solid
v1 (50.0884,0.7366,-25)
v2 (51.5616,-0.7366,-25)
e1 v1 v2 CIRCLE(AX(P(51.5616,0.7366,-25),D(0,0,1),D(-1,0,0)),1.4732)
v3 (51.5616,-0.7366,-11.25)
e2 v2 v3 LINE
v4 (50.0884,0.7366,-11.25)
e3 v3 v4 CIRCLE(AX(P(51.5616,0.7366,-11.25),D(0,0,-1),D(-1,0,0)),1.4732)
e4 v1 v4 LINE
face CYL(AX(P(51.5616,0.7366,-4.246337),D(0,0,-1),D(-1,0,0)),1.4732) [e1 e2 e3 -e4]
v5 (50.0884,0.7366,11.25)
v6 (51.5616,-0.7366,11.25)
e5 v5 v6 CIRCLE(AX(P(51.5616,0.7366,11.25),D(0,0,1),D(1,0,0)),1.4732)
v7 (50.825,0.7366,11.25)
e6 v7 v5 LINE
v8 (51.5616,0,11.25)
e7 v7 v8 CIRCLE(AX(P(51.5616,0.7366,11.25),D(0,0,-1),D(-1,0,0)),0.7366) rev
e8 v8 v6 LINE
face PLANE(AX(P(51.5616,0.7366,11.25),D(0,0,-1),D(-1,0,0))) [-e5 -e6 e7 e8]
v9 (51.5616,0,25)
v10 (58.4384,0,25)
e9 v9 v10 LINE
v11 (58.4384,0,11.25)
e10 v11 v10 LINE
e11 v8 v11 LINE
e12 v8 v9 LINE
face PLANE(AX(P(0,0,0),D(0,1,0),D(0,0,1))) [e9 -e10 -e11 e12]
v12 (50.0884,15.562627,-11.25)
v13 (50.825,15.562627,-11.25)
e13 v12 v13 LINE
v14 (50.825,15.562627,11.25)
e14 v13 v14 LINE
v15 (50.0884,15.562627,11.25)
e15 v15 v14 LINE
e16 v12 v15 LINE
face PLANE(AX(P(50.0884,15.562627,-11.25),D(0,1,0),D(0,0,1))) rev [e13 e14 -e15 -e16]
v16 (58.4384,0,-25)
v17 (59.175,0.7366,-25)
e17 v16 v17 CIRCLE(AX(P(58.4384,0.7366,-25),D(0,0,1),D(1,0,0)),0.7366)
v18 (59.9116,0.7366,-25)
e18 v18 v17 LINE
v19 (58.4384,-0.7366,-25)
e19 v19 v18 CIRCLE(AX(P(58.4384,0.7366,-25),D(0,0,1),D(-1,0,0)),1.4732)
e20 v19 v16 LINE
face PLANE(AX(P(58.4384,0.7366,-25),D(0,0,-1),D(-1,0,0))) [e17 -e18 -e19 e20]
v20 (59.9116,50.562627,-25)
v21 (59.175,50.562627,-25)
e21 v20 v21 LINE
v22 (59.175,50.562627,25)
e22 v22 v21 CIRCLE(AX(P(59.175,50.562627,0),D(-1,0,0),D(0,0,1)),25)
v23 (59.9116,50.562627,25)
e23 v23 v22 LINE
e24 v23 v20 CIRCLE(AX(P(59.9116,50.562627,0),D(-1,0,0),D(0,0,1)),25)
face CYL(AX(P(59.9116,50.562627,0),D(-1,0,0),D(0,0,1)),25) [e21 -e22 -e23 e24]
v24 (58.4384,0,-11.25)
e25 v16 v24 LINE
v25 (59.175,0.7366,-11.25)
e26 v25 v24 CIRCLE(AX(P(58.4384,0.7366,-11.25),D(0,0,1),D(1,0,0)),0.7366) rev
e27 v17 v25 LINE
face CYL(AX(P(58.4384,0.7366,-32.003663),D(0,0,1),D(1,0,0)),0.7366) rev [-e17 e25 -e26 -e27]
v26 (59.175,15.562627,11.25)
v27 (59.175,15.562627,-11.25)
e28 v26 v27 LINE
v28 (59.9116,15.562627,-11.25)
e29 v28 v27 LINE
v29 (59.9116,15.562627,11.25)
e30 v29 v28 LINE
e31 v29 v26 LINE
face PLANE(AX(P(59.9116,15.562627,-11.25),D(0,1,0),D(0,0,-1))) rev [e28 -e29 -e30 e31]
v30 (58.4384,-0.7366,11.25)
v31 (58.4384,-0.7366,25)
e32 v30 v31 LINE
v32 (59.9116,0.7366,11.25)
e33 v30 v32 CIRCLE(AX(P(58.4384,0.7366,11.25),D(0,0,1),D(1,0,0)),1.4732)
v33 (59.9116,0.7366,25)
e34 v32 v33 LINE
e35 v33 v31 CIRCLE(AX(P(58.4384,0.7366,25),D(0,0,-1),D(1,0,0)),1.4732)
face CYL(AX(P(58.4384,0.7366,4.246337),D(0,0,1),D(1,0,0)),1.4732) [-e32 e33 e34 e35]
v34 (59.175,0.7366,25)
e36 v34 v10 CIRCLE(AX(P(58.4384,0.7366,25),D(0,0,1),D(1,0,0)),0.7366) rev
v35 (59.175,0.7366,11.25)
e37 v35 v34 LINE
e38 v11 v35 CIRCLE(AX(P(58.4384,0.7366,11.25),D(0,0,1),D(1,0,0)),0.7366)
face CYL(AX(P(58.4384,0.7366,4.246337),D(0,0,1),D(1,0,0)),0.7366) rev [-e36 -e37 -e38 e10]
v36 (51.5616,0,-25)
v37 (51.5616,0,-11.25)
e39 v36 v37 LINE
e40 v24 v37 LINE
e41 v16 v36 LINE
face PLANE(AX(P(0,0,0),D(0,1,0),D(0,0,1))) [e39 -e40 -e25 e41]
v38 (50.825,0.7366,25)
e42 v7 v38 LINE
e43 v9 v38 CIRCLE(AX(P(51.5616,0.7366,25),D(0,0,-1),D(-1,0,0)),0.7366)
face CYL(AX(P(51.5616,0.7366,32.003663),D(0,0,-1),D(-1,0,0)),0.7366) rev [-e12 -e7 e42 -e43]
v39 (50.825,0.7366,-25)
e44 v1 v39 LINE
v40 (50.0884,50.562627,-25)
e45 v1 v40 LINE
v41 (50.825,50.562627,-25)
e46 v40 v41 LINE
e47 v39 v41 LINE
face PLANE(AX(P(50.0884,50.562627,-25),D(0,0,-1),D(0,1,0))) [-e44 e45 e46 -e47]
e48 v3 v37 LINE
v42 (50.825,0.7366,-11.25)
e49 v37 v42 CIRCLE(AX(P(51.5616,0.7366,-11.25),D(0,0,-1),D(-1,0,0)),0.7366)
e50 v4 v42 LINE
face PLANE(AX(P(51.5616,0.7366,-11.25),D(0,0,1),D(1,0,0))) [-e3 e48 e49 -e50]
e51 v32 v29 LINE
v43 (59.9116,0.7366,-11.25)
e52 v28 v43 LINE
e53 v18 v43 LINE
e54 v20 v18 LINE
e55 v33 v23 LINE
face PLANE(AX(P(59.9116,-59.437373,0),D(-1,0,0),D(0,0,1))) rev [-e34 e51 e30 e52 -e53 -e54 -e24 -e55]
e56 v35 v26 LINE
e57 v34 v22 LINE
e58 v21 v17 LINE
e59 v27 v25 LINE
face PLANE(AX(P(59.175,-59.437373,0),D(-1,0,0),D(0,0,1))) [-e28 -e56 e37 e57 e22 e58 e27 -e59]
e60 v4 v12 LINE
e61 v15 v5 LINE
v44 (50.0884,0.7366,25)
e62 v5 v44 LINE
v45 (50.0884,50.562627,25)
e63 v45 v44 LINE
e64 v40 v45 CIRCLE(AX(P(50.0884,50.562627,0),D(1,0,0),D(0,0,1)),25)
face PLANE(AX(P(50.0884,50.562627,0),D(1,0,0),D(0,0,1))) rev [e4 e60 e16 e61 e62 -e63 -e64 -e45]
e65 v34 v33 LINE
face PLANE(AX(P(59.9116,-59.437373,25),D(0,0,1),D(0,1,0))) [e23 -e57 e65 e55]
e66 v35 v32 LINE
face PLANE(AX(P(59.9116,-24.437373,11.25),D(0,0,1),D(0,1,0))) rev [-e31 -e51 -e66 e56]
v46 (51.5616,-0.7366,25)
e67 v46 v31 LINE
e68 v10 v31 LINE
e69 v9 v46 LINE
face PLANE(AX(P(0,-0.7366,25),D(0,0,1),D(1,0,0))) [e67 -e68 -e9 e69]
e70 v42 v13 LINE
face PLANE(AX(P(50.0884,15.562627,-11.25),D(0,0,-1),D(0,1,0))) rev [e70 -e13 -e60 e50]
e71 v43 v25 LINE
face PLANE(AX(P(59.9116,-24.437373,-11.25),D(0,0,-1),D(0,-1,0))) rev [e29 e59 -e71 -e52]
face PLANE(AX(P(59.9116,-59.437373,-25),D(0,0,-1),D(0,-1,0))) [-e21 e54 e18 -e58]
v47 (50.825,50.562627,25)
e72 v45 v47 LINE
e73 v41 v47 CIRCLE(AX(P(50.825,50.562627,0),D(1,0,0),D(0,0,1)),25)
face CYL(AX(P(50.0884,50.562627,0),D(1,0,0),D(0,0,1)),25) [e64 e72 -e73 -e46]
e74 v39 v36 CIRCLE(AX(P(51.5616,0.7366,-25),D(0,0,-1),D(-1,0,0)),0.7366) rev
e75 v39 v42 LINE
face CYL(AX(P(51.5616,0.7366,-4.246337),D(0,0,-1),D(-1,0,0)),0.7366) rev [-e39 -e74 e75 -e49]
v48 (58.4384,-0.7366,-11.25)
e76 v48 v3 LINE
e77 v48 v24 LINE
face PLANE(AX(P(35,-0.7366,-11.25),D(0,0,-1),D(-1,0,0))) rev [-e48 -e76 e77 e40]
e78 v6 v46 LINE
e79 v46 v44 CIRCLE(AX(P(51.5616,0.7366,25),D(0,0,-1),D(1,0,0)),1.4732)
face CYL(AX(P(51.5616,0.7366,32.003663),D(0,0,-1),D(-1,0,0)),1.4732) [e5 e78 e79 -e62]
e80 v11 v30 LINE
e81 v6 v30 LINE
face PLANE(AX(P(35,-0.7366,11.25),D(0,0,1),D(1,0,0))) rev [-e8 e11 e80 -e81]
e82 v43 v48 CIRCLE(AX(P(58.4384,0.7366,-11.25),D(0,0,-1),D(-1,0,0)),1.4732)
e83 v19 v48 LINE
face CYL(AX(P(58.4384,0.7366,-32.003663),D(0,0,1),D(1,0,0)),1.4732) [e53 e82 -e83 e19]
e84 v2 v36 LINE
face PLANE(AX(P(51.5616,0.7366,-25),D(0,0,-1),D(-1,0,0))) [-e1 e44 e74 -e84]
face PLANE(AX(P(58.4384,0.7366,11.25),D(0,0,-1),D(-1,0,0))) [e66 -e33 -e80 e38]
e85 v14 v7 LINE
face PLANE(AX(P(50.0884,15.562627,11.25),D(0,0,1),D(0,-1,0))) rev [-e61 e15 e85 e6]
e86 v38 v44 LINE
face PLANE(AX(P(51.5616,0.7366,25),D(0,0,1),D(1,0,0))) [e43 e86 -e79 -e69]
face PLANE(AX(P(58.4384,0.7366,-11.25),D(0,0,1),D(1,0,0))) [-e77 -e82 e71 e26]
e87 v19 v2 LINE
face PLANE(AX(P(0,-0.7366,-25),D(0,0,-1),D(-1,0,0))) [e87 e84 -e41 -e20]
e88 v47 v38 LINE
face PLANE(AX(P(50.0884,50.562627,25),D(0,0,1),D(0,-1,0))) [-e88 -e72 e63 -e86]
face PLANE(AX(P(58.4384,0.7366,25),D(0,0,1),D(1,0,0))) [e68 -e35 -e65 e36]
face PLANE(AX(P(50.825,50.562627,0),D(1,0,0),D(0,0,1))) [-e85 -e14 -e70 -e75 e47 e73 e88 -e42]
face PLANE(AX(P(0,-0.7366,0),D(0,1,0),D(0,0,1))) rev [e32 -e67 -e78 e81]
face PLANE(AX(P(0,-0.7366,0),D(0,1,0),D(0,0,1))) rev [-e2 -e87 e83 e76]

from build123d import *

# Parameters (mm, degrees)
SKETCH2_W                  = 40
SKETCH2_H                  = 22.5
BASE_FLANGE1_DEPTH         = 0.7366
SKETCHED_START             = -25
SKETCHED_BEND1_DEPTH       = 50
SKETCHED_BEND1_2_DEPTH     = 13.75
SKETCHED_START_2           = 11.25
SKETCHED_BEND1_3_DEPTH     = 13.75
SKETCHED_START_3           = -26
SKETCHED_BEND1_4_OUTLINE_W = 0.7366
SKETCHED_BEND1_4_OUTLINE_H = 50
SKETCHED_BEND1_4_DEPTH     = 61
SKETCHED_START_4           = 75
SKETCHED_BEND1_5_OUTLINE_W = 0.7366
SKETCHED_BEND1_5_OUTLINE_H = 50
SKETCHED_BEND1_5_DEPTH     = 61
SKETCHED_START_5           = 50.0884
SKETCHED_BEND1_6_DEPTH     = 0.7366
SKETCHED_START_6           = 59.175
SKETCHED_BEND1_7_DEPTH     = 0.7366


with BuildPart() as part:
    # Base-Flange1: sheet metal written as solids
    # Sketch2 → Base-Flange1 (new body)
    with BuildSketch(Plane(origin=(0, 0, 0), x_dir=(1, 0, 0), z_dir=(0, 1, 0))):
        with BuildLine():
            Line((0, 25), (110, 25))
            ThreePointArc((110, 25), (135, 0), (110, -25))
            Line((110, -25), (0, -25))
            ThreePointArc((0, -25), (-25, 0), (0, 25))
        make_face()
        with Locations((55, 0)):
            Rectangle(SKETCH2_W, SKETCH2_H, mode=Mode.SUBTRACT)
    extrude(amount=-BASE_FLANGE1_DEPTH)

    # Sketched Bend1: read off the stored shape, not the designer's step
    # Sketched Bend1 outline → Sketched Bend1 (cut)
    with BuildSketch(Plane.XY.offset(SKETCHED_START)):
        with BuildLine():
            Line((35, -0.7366), (51.5616, -0.7366))
            ThreePointArc((51.5616, -0.7366), (50.825, -0.539228625), (50.285771375, 0))
            Line((50.285771375, 0), (35, 0))
            Line((35, 0), (35, -0.7366))
        make_face()
        with BuildLine():
            ThreePointArc((59.714228625, 0), (59.175, -0.539228625), (58.4384, -0.7366))
            Line((58.4384, -0.7366), (75, -0.7366))
            Line((75, -0.7366), (75, 0))
            Line((75, 0), (59.714228625, 0))
        make_face()
    extrude(amount=SKETCHED_BEND1_DEPTH, mode=Mode.SUBTRACT)

    # Sketched Bend1 2 outline → Sketched Bend1 2 (add)
    with BuildSketch(Plane.XY.offset(SKETCHED_START)):
        with BuildLine():
            ThreePointArc((50.0884, 0.7366), (50.138598073, 0.355307783), (50.285771375, 0))
            Line((50.285771375, 0), (51.5616, 0))
            ThreePointArc((51.5616, 0), (51.040745145, 0.215745145), (50.825, 0.7366))
            Line((50.825, 0.7366), (50.825, 15.562627139))
            Line((50.825, 15.562627139), (50.0884, 15.562627139))
            Line((50.0884, 15.562627139), (50.0884, 0.7366))
        make_face()
        with BuildLine():
            Line((58.4384, 0), (59.714228625, 0))
            ThreePointArc((59.714228625, 0), (59.861401927, 0.355307783), (59.9116, 0.7366))
            Line((59.9116, 0.7366), (59.9116, 15.562627139))
            Line((59.9116, 15.562627139), (59.175, 15.562627139))
            Line((59.175, 15.562627139), (59.175, 0.7366))
            ThreePointArc((59.175, 0.7366), (58.959254855, 0.215745145), (58.4384, 0))
        make_face()
    extrude(amount=SKETCHED_BEND1_2_DEPTH)

    # Sketched Bend1 3 outline → Sketched Bend1 3 (add)
    with BuildSketch(Plane.XY.offset(SKETCHED_START_2)):
        with BuildLine():
            ThreePointArc((50.0884, 0.7366), (50.138598073, 0.355307783), (50.285771375, 0))
            Line((50.285771375, 0), (51.5616, 0))
            ThreePointArc((51.5616, 0), (51.040745145, 0.215745145), (50.825, 0.7366))
            Line((50.825, 0.7366), (50.825, 15.562627139))
            Line((50.825, 15.562627139), (50.0884, 15.562627139))
            Line((50.0884, 15.562627139), (50.0884, 0.7366))
        make_face()
        with BuildLine():
            Line((58.4384, 0), (59.714228625, 0))
            ThreePointArc((59.714228625, 0), (59.861401927, 0.355307783), (59.9116, 0.7366))
            Line((59.9116, 0.7366), (59.9116, 15.562627139))
            Line((59.9116, 15.562627139), (59.175, 15.562627139))
            Line((59.175, 15.562627139), (59.175, 0.7366))
            ThreePointArc((59.175, 0.7366), (58.959254855, 0.215745145), (58.4384, 0))
        make_face()
    extrude(amount=SKETCHED_BEND1_3_DEPTH)

    # Sketched Bend1 4 outline → Sketched Bend1 4 (cut)
    with BuildSketch(Plane.YZ.offset(SKETCHED_START_3)):
        with Locations((-0.3683, 0)):
            Rectangle(SKETCHED_BEND1_4_OUTLINE_W, SKETCHED_BEND1_4_OUTLINE_H)
    extrude(amount=SKETCHED_BEND1_4_DEPTH, mode=Mode.SUBTRACT)

    # Sketched Bend1 5 outline → Sketched Bend1 5 (cut)
    with BuildSketch(Plane.YZ.offset(SKETCHED_START_4)):
        with Locations((-0.3683, 0)):
            Rectangle(SKETCHED_BEND1_5_OUTLINE_W, SKETCHED_BEND1_5_OUTLINE_H)
    extrude(amount=SKETCHED_BEND1_5_DEPTH, mode=Mode.SUBTRACT)

    # Sketched Bend1 6 outline → Sketched Bend1 6 (add)
    with BuildSketch(Plane.YZ.offset(SKETCHED_START_5)):
        with BuildLine():
            ThreePointArc((50.562627139, -25), (75.562627139, 0), (50.562627139, 25))
            Line((50.562627139, 25), (15.562627139, 25))
            Line((15.562627139, 25), (15.562627139, -25))
            Line((15.562627139, -25), (50.562627139, -25))
        make_face()
    extrude(amount=SKETCHED_BEND1_6_DEPTH)

    # Sketched Bend1 7 outline → Sketched Bend1 7 (add)
    with BuildSketch(Plane.YZ.offset(SKETCHED_START_6)):
        with BuildLine():
            ThreePointArc((50.562627139, -25), (75.562627139, 0), (50.562627139, 25))
            Line((50.562627139, 25), (15.562627139, 25))
            Line((15.562627139, 25), (15.562627139, -25))
            Line((15.562627139, -25), (50.562627139, -25))
        make_face()
    extrude(amount=SKETCHED_BEND1_7_DEPTH)


solid = part.part
